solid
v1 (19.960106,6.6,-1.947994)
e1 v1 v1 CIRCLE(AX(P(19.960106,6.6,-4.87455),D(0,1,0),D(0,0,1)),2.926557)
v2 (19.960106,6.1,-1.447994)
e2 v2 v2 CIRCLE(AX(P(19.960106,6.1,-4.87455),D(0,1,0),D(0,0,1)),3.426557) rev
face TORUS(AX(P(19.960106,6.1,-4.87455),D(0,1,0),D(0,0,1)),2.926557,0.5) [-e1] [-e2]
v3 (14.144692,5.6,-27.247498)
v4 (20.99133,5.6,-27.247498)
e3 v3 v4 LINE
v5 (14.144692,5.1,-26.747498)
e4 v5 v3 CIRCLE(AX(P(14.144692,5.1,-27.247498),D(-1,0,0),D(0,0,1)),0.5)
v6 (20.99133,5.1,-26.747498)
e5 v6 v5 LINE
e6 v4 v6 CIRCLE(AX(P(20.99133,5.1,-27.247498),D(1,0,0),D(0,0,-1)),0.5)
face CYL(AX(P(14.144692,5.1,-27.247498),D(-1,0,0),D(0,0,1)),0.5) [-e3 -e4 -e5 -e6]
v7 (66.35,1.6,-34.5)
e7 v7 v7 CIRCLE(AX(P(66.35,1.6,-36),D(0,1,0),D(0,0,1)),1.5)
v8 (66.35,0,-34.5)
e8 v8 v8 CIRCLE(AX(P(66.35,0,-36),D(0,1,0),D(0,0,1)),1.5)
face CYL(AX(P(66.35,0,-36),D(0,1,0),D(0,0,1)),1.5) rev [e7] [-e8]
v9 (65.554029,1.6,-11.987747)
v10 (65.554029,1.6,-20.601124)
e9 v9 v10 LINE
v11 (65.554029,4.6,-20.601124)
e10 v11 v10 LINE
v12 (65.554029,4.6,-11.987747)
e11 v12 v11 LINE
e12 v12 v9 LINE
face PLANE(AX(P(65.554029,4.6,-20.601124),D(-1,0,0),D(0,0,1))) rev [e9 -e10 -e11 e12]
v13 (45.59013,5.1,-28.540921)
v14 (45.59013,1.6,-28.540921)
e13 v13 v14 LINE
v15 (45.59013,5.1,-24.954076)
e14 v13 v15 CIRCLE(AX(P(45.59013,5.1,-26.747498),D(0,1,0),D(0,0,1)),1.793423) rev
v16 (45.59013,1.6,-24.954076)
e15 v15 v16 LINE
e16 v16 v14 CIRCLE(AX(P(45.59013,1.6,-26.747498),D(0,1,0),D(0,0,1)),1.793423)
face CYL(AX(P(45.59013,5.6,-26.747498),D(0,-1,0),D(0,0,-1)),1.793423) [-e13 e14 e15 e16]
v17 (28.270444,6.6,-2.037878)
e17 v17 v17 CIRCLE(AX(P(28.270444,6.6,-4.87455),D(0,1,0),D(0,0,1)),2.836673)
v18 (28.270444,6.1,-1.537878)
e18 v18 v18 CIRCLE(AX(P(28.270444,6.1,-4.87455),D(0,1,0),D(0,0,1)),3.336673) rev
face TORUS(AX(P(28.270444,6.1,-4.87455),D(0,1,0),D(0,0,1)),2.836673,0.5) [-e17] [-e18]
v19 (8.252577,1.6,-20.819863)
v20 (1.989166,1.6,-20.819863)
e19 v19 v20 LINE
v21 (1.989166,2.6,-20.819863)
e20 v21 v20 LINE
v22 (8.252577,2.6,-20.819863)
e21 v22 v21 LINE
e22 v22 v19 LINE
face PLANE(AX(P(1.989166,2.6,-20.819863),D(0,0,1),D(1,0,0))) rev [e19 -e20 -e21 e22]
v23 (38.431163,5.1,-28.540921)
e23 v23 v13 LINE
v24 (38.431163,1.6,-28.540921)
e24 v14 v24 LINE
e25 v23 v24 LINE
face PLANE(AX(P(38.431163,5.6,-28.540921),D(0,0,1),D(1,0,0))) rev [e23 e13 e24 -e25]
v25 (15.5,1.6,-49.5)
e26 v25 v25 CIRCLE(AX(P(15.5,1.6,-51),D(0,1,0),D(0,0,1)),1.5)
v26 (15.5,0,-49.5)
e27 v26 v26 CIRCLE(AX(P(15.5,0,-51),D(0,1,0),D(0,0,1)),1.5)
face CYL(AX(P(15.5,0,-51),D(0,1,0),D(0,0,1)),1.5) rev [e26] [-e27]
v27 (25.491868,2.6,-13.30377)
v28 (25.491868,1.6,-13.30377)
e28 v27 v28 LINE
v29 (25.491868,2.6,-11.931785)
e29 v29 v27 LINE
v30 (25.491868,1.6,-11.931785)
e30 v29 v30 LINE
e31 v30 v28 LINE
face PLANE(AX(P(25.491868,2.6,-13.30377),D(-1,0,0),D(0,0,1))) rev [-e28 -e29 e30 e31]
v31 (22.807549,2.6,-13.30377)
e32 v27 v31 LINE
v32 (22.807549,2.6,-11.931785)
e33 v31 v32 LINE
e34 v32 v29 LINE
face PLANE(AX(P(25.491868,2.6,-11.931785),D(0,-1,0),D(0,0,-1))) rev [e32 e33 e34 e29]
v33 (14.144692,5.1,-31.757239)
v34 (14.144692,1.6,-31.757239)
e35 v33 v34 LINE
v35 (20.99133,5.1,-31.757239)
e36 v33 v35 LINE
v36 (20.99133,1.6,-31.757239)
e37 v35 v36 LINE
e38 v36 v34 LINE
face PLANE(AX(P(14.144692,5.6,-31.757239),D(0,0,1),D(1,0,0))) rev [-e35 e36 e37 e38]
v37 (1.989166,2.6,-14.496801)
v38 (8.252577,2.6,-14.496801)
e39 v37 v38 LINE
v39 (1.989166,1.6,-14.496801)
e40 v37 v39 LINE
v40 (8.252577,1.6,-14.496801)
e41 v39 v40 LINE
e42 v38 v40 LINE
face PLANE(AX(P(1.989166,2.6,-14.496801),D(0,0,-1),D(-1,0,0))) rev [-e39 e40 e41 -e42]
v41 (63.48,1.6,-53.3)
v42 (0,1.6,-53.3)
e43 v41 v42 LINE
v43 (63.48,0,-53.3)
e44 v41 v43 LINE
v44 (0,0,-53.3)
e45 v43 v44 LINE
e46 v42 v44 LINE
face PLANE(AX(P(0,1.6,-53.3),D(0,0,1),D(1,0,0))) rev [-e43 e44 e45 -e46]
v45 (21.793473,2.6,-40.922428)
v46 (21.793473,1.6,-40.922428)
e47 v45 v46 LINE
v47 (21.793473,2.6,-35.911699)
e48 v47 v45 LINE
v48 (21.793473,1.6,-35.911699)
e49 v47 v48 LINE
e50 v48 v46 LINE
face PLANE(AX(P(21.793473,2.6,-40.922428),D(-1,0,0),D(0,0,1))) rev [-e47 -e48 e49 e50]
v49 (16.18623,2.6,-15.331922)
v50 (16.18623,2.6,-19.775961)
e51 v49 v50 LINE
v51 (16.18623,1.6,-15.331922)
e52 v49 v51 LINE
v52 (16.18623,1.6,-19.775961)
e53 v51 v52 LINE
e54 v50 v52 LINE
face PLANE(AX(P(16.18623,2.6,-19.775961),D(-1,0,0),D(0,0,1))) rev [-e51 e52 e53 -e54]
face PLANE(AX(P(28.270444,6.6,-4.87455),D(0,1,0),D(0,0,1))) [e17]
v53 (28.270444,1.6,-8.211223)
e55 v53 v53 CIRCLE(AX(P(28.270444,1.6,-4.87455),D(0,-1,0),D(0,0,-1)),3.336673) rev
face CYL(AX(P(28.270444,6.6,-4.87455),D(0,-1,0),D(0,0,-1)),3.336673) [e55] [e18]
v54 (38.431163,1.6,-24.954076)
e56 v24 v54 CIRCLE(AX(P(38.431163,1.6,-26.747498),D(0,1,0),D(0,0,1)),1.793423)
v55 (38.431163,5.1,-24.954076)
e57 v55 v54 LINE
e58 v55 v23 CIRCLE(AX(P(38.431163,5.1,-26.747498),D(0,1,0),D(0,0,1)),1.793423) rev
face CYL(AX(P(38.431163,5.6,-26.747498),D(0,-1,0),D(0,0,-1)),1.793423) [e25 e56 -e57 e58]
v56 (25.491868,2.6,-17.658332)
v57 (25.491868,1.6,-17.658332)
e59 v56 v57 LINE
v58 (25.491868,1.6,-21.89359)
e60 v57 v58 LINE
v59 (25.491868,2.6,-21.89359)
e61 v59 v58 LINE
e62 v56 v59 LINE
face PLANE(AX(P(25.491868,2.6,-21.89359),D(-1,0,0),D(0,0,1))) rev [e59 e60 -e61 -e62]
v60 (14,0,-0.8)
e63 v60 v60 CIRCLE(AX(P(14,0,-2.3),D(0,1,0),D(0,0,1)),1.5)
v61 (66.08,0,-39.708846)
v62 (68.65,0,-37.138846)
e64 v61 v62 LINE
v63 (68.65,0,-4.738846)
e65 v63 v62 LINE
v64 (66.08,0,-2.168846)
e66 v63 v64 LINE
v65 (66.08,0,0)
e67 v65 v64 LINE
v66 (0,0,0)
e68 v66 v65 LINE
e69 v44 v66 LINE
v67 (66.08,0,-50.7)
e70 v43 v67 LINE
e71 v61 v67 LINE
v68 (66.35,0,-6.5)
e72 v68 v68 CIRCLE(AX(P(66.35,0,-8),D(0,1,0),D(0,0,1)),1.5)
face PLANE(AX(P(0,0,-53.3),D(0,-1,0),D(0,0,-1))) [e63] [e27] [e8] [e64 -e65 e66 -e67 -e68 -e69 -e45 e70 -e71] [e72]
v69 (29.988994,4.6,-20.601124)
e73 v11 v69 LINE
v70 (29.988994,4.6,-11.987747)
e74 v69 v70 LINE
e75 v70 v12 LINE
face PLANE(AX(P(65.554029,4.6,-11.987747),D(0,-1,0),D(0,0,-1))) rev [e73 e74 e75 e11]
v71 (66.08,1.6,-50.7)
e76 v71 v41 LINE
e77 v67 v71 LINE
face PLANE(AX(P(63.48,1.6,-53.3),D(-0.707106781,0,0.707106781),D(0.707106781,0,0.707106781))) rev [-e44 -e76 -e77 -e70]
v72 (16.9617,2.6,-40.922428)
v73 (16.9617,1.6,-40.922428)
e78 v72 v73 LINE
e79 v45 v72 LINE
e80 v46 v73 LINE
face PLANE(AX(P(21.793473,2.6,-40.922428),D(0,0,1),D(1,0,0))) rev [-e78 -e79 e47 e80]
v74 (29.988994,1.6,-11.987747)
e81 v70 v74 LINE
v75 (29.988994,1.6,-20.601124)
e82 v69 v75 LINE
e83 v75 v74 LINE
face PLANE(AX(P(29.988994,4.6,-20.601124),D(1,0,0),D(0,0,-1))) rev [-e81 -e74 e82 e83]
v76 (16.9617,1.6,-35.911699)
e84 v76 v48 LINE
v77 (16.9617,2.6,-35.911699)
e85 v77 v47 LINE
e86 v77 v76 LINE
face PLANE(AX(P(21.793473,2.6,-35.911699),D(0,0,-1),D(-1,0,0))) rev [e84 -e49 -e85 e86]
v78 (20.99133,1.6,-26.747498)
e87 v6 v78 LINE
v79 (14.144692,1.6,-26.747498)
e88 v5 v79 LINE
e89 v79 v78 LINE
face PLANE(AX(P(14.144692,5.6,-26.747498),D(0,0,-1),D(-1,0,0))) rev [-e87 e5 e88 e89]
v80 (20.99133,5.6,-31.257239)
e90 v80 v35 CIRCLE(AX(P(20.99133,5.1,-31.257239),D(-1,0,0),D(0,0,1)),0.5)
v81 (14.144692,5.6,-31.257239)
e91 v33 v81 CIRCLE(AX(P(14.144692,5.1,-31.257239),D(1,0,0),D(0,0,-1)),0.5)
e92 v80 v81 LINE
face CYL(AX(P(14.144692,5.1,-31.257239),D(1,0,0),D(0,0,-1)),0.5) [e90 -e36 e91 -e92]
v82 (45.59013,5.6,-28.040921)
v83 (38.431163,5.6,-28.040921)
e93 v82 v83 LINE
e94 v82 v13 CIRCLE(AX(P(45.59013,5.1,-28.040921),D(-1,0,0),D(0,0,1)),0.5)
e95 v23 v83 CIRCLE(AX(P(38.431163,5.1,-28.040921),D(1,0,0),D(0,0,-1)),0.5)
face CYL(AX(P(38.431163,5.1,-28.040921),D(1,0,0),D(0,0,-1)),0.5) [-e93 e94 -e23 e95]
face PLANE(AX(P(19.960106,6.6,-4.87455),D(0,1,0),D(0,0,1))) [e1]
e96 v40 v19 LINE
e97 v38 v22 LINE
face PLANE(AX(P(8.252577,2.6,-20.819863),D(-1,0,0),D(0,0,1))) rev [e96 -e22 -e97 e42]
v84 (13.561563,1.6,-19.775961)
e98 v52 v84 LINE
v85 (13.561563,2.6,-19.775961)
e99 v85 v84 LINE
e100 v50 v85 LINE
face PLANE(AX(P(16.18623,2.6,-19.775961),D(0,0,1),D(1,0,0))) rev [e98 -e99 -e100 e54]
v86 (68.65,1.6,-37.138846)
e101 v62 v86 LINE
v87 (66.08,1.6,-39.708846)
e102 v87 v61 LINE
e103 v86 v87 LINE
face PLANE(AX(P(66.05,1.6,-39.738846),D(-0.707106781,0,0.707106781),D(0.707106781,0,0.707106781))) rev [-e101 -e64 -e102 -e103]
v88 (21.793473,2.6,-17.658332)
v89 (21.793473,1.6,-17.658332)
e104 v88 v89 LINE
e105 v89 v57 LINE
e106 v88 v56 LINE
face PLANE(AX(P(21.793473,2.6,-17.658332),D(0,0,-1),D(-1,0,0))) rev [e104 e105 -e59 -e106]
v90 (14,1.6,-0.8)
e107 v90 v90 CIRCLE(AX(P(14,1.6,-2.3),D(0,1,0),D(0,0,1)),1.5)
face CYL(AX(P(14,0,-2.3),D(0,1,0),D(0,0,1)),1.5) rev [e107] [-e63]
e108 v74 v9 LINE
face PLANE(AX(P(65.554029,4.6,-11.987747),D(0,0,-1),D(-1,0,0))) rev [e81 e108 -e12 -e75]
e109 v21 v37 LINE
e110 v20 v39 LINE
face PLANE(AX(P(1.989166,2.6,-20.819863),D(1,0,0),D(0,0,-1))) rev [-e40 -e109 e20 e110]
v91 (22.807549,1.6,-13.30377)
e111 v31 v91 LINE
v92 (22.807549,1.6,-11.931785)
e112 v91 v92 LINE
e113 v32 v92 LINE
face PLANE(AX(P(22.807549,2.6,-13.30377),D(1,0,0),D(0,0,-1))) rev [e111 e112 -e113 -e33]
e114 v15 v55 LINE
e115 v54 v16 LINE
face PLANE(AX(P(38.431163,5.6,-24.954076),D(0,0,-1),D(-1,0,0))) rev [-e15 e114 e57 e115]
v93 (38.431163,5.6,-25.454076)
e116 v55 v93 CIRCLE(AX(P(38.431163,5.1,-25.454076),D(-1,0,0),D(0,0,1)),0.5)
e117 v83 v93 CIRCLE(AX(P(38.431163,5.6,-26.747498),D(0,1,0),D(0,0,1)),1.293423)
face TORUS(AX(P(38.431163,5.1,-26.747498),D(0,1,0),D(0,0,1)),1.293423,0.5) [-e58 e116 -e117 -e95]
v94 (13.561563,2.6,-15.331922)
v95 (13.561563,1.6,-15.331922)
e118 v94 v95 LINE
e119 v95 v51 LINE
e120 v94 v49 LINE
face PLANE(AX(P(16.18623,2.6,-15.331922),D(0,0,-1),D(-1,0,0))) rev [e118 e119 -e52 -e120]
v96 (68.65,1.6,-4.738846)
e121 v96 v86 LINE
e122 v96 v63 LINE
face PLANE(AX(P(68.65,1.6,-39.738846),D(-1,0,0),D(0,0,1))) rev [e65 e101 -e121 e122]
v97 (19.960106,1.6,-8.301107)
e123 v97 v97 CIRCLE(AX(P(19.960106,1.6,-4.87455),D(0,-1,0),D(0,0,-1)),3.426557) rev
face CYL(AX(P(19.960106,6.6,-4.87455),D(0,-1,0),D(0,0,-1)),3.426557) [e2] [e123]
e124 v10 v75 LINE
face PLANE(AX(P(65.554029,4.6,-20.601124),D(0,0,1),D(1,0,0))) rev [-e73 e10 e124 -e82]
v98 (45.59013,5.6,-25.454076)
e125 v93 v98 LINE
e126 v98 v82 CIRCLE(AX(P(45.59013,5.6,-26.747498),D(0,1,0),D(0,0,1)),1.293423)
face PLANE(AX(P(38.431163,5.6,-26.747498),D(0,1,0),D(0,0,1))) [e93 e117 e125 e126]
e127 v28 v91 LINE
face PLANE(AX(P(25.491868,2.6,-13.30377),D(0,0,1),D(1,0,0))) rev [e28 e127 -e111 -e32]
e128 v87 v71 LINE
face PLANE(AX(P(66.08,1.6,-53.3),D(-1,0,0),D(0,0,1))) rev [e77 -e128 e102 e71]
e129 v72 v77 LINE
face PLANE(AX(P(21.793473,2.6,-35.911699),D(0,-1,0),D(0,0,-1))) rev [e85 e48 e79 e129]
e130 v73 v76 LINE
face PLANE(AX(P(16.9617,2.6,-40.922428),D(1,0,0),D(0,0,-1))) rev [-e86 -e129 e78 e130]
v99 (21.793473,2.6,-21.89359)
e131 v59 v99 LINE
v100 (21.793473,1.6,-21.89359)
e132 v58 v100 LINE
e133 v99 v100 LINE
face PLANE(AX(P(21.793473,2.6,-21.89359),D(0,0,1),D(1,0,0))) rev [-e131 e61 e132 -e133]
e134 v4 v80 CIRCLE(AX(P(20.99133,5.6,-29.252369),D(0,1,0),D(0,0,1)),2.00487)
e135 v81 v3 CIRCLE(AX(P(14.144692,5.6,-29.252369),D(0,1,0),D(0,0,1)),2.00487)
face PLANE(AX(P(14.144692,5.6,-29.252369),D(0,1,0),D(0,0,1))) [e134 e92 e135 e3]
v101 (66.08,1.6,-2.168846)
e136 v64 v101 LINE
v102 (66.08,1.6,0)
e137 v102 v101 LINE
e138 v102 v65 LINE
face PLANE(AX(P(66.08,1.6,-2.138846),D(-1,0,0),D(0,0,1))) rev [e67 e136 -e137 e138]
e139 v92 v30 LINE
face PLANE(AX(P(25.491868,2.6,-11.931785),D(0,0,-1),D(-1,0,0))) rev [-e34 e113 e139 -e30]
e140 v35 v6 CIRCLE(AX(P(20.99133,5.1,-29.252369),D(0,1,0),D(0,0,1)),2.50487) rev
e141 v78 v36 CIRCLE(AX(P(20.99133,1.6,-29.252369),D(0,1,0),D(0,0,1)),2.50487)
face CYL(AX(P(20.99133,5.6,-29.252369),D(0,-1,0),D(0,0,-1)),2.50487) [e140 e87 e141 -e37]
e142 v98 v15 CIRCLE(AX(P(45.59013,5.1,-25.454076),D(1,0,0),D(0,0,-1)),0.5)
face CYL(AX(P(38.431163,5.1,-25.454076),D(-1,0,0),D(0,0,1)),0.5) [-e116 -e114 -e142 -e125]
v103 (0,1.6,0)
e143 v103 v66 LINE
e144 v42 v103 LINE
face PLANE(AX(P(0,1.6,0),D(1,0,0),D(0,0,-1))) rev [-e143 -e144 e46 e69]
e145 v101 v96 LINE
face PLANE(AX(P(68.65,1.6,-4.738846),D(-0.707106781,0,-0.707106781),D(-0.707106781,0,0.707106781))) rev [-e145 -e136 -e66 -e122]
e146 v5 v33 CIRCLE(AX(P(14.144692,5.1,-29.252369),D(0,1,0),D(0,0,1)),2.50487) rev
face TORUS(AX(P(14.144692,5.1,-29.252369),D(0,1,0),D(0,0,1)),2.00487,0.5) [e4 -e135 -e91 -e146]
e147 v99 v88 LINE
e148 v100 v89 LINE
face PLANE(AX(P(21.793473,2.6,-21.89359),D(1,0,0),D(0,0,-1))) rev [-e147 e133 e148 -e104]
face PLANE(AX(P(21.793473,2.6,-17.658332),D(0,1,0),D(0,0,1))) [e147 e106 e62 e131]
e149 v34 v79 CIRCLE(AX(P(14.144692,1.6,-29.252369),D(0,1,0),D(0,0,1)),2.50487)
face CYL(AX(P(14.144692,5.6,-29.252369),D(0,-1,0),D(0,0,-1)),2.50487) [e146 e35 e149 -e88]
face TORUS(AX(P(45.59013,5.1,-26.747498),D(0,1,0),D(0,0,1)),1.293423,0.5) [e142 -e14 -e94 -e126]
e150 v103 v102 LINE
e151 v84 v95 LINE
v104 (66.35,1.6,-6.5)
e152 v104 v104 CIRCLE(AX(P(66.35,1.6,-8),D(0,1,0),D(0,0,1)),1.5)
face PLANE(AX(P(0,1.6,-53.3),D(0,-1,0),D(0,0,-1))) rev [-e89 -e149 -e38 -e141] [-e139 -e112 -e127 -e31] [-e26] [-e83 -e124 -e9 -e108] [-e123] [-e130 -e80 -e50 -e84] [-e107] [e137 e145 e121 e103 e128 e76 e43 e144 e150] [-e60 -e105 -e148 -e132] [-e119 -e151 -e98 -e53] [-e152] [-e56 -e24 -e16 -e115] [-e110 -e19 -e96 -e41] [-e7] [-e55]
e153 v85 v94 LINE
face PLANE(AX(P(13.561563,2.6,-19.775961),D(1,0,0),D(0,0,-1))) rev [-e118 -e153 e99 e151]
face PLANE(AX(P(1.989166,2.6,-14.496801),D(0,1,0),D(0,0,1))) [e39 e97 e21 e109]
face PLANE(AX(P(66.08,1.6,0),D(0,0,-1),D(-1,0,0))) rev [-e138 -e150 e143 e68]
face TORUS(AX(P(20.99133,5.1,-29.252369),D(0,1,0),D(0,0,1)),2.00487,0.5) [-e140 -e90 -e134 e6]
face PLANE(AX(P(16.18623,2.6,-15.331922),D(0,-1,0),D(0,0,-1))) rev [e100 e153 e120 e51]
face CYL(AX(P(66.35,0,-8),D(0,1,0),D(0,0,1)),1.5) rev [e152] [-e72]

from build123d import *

# Parameters (mm, degrees)
SALIENTE_EXTRUIR1_DEPTH = 1.6
CHAFL_N1_SIZE           = 2.6
CROQUIS2_R              = 1.5
CORTAR_EXTRUIR1_DEPTH   = 87.926822673
CROQUIS3_W              = 35.565034919
CROQUIS3_H              = 8.613377017
SALIENTE_EXTRUIR2_DEPTH = 3
CROQUIS4_R              = 3.336672647
CROQUIS4_R_2            = 3.426556793
SALIENTE_EXTRUIR3_DEPTH = 5
CROQUIS5_W              = 6.263410385
CROQUIS5_H              = 6.323061912
CROQUIS5_W_2            = 3.698394703
CROQUIS5_H_2            = 4.23525845
CROQUIS5_W_3            = 2.624667209
CROQUIS5_H_3            = 4.444038797
CROQUIS5_W_4            = 2.684318736
CROQUIS5_H_4            = 1.371985132
CROQUIS5_W_5            = 4.831773725
CROQUIS5_H_5            = 5.010728307
SALIENTE_EXTRUIR4_DEPTH = 1
SALIENTE_EXTRUIR5_DEPTH = 4
REDONDEO1_R             = 0.5


with BuildPart() as part:
    # Croquis1 → Saliente-Extruir1 (new body)
    with BuildSketch(Plane(origin=(0, 0, 0), x_dir=(1, 0, 0), z_dir=(0, 1, 0))):
        Polygon((0, 53.3), (66.08, 53.3), (66.08, 39.738845798), (68.65, 39.738845798), (68.65, 2.138845798), (66.08, 2.138845798), (66.08, 0), (0, 0), align=None)
    extrude(amount=SALIENTE_EXTRUIR1_DEPTH)

    # Chaflán1
    # the kernel refuses this chamfer: 2.6 mm, written as the material it takes off along each edge
    with BuildSketch(Plane(origin=(68.65, -6.686375769, -39.738845798), x_dir=(-0.9996219169112966, 0, -0.027495876610585446), z_dir=(0, 1, 0))) as chafl_n1_piece_1_section:
        Polygon((CHAFL_N1_SIZE * 0.999621916911, CHAFL_N1_SIZE * 0.0274958766106), (-CHAFL_N1_SIZE * 0.0274958766106, CHAFL_N1_SIZE * 0.999621916911), (0, 0), align=None)
    chafl_n1_piece_1 = extrude(amount=14.972751537, mode=Mode.PRIVATE)
    chafl_n1_piece_1 = split(chafl_n1_piece_1, bisect_by=Plane(origin=(66.08, 0.8, -38.878812764), z_dir=(1, 0, 0)), keep=Keep.TOP, mode=Mode.PRIVATE)
    add(chafl_n1_piece_1, mode=Mode.SUBTRACT)
    with BuildSketch(Plane(origin=(68.65, -6.686375769, -2.138845798), x_dir=(0.027495876610585345, 0, -0.9996219169112966), z_dir=(0, 1, 0))) as chafl_n1_piece_2_section:
        Polygon((CHAFL_N1_SIZE * 0.999621916911, CHAFL_N1_SIZE * 0.0274958766106), (-CHAFL_N1_SIZE * 0.0274958766106, CHAFL_N1_SIZE * 0.999621916911), (0, 0), align=None)
    chafl_n1_piece_2 = extrude(amount=14.972751537, mode=Mode.PRIVATE)
    chafl_n1_piece_2 = split(chafl_n1_piece_2, bisect_by=Plane(origin=(66.08, 0.8, -2.998878832), z_dir=(1, 0, 0)), keep=Keep.TOP, mode=Mode.PRIVATE)
    add(chafl_n1_piece_2, mode=Mode.SUBTRACT)
    with BuildSketch(Plane(origin=(66.08, -6.686375769, -53.3), x_dir=(-0.9996219169112966, 0, -0.027495876610585373), z_dir=(0, 1, 0))) as chafl_n1_piece_3:
        Polygon((CHAFL_N1_SIZE * 0.999621916911, CHAFL_N1_SIZE * 0.0274958766106), (-CHAFL_N1_SIZE * 0.0274958766106, CHAFL_N1_SIZE * 0.999621916911), (0, 0), align=None)
    extrude(amount=14.972751537, mode=Mode.SUBTRACT)

    # Croquis2 → Cortar-Extruir1 (cut, through all)
    with BuildSketch(Plane(origin=(0, 1.6, 0), x_dir=(1, 0, 0), z_dir=(0, 1, 0))):
        with Locations(Location((15.5, 51, 0), (0, 0, 270))):
            Circle(CROQUIS2_R)
        with Locations(Location((66.35, 36, 0), (0, 0, 270))):
            Circle(CROQUIS2_R)
        with Locations(Location((66.35, 8, 0), (0, 0, 270))):
            Circle(CROQUIS2_R)
        with Locations(Location((14, 2.3, 0), (0, 0, 270))):
            Circle(CROQUIS2_R)
    extrude(amount=-CORTAR_EXTRUIR1_DEPTH, mode=Mode.SUBTRACT)

    # Croquis3 → Saliente-Extruir2 (add)
    with BuildSketch(Plane(origin=(0, 1.6, 0), x_dir=(1, 0, 0), z_dir=(0, 1, 0))):
        with Locations((47.771511194, 16.294435422)):
            Rectangle(CROQUIS3_W, CROQUIS3_H)
    extrude(amount=SALIENTE_EXTRUIR2_DEPTH)

    # Croquis4 → Saliente-Extruir3 (add)
    with BuildSketch(Plane(origin=(0, 1.6, 0), x_dir=(1, 0, 0), z_dir=(0, 1, 0))):
        with Locations(Location((28.27044436, 4.874550457, 0), (0, 0, 90))):
            Circle(CROQUIS4_R)
        with Locations(Location((19.960106187, 4.874550457, 0), (0, 0, 90))):
            Circle(CROQUIS4_R_2)
    extrude(amount=SALIENTE_EXTRUIR3_DEPTH)

    # Croquis5 → Saliente-Extruir4 (add)
    with BuildSketch(Plane(origin=(0, 1.6, 0), x_dir=(1, 0, 0), z_dir=(0, 1, 0))):
        with Locations((5.120871528, 17.658331847)):
            Rectangle(CROQUIS5_W, CROQUIS5_H)
        with Locations((23.642670808, 19.775961072)):
            Rectangle(CROQUIS5_W_2, CROQUIS5_H_2)
        with Locations((14.87389627, 17.553941673)):
            Rectangle(CROQUIS5_W_3, CROQUIS5_H_3)
        with Locations((24.149708791, 12.617777775)):
            Rectangle(CROQUIS5_W_4, CROQUIS5_H_4)
        with Locations((19.377586593, 38.417063407)):
            Rectangle(CROQUIS5_W_5, CROQUIS5_H_5)
    extrude(amount=SALIENTE_EXTRUIR4_DEPTH)

    # Croquis6 → Saliente-Extruir5 (add)
    with BuildSketch(Plane(origin=(0, 1.6, 0), x_dir=(1, 0, 0), z_dir=(0, 1, 0))):
        with BuildLine():
            Line((14.144691977, 31.757239244), (20.991330498, 31.757239244))
            ThreePointArc((20.991330498, 31.757239244), (23.496200875, 29.252368867), (20.991330498, 26.74749849))
            Line((20.991330498, 26.74749849), (14.144691977, 26.74749849))
            ThreePointArc((14.144691977, 26.74749849), (11.6398216, 29.252368867), (14.144691977, 31.757239244))
        make_face()
        with BuildLine():
            Line((38.431163378, 28.540921146), (45.590129983, 28.540921146))
            ThreePointArc((45.590129983, 28.540921146), (47.383552638, 26.74749849), (45.590129983, 24.954075835))
            Line((45.590129983, 24.954075835), (38.431163378, 24.954075835))
            ThreePointArc((38.431163378, 24.954075835), (36.637740722, 26.74749849), (38.431163378, 28.540921146))
        make_face()
    extrude(amount=SALIENTE_EXTRUIR5_DEPTH)

    # Redondeo1
    redondeo1_edges = [part.edges().sort_by_distance(p)[0] for p in [
        (11.6398216, 5.6, -29.252368867),
        (17.568011237, 5.6, -26.74749849),
        (23.496200875, 5.6, -29.252368867),
        (17.568011237, 5.6, -31.757239244),
        (36.637740722, 5.6, -26.74749849),
        (42.01064668, 5.6, -24.954075835),
        (47.383552638, 5.6, -26.74749849),
        (42.01064668, 5.6, -28.540921146),
        (28.27044436, 6.6, -1.53787781),
        (19.960106187, 6.6, -1.447993664),
    ]]
    fillet(redondeo1_edges, radius=REDONDEO1_R)


solid = part.part
